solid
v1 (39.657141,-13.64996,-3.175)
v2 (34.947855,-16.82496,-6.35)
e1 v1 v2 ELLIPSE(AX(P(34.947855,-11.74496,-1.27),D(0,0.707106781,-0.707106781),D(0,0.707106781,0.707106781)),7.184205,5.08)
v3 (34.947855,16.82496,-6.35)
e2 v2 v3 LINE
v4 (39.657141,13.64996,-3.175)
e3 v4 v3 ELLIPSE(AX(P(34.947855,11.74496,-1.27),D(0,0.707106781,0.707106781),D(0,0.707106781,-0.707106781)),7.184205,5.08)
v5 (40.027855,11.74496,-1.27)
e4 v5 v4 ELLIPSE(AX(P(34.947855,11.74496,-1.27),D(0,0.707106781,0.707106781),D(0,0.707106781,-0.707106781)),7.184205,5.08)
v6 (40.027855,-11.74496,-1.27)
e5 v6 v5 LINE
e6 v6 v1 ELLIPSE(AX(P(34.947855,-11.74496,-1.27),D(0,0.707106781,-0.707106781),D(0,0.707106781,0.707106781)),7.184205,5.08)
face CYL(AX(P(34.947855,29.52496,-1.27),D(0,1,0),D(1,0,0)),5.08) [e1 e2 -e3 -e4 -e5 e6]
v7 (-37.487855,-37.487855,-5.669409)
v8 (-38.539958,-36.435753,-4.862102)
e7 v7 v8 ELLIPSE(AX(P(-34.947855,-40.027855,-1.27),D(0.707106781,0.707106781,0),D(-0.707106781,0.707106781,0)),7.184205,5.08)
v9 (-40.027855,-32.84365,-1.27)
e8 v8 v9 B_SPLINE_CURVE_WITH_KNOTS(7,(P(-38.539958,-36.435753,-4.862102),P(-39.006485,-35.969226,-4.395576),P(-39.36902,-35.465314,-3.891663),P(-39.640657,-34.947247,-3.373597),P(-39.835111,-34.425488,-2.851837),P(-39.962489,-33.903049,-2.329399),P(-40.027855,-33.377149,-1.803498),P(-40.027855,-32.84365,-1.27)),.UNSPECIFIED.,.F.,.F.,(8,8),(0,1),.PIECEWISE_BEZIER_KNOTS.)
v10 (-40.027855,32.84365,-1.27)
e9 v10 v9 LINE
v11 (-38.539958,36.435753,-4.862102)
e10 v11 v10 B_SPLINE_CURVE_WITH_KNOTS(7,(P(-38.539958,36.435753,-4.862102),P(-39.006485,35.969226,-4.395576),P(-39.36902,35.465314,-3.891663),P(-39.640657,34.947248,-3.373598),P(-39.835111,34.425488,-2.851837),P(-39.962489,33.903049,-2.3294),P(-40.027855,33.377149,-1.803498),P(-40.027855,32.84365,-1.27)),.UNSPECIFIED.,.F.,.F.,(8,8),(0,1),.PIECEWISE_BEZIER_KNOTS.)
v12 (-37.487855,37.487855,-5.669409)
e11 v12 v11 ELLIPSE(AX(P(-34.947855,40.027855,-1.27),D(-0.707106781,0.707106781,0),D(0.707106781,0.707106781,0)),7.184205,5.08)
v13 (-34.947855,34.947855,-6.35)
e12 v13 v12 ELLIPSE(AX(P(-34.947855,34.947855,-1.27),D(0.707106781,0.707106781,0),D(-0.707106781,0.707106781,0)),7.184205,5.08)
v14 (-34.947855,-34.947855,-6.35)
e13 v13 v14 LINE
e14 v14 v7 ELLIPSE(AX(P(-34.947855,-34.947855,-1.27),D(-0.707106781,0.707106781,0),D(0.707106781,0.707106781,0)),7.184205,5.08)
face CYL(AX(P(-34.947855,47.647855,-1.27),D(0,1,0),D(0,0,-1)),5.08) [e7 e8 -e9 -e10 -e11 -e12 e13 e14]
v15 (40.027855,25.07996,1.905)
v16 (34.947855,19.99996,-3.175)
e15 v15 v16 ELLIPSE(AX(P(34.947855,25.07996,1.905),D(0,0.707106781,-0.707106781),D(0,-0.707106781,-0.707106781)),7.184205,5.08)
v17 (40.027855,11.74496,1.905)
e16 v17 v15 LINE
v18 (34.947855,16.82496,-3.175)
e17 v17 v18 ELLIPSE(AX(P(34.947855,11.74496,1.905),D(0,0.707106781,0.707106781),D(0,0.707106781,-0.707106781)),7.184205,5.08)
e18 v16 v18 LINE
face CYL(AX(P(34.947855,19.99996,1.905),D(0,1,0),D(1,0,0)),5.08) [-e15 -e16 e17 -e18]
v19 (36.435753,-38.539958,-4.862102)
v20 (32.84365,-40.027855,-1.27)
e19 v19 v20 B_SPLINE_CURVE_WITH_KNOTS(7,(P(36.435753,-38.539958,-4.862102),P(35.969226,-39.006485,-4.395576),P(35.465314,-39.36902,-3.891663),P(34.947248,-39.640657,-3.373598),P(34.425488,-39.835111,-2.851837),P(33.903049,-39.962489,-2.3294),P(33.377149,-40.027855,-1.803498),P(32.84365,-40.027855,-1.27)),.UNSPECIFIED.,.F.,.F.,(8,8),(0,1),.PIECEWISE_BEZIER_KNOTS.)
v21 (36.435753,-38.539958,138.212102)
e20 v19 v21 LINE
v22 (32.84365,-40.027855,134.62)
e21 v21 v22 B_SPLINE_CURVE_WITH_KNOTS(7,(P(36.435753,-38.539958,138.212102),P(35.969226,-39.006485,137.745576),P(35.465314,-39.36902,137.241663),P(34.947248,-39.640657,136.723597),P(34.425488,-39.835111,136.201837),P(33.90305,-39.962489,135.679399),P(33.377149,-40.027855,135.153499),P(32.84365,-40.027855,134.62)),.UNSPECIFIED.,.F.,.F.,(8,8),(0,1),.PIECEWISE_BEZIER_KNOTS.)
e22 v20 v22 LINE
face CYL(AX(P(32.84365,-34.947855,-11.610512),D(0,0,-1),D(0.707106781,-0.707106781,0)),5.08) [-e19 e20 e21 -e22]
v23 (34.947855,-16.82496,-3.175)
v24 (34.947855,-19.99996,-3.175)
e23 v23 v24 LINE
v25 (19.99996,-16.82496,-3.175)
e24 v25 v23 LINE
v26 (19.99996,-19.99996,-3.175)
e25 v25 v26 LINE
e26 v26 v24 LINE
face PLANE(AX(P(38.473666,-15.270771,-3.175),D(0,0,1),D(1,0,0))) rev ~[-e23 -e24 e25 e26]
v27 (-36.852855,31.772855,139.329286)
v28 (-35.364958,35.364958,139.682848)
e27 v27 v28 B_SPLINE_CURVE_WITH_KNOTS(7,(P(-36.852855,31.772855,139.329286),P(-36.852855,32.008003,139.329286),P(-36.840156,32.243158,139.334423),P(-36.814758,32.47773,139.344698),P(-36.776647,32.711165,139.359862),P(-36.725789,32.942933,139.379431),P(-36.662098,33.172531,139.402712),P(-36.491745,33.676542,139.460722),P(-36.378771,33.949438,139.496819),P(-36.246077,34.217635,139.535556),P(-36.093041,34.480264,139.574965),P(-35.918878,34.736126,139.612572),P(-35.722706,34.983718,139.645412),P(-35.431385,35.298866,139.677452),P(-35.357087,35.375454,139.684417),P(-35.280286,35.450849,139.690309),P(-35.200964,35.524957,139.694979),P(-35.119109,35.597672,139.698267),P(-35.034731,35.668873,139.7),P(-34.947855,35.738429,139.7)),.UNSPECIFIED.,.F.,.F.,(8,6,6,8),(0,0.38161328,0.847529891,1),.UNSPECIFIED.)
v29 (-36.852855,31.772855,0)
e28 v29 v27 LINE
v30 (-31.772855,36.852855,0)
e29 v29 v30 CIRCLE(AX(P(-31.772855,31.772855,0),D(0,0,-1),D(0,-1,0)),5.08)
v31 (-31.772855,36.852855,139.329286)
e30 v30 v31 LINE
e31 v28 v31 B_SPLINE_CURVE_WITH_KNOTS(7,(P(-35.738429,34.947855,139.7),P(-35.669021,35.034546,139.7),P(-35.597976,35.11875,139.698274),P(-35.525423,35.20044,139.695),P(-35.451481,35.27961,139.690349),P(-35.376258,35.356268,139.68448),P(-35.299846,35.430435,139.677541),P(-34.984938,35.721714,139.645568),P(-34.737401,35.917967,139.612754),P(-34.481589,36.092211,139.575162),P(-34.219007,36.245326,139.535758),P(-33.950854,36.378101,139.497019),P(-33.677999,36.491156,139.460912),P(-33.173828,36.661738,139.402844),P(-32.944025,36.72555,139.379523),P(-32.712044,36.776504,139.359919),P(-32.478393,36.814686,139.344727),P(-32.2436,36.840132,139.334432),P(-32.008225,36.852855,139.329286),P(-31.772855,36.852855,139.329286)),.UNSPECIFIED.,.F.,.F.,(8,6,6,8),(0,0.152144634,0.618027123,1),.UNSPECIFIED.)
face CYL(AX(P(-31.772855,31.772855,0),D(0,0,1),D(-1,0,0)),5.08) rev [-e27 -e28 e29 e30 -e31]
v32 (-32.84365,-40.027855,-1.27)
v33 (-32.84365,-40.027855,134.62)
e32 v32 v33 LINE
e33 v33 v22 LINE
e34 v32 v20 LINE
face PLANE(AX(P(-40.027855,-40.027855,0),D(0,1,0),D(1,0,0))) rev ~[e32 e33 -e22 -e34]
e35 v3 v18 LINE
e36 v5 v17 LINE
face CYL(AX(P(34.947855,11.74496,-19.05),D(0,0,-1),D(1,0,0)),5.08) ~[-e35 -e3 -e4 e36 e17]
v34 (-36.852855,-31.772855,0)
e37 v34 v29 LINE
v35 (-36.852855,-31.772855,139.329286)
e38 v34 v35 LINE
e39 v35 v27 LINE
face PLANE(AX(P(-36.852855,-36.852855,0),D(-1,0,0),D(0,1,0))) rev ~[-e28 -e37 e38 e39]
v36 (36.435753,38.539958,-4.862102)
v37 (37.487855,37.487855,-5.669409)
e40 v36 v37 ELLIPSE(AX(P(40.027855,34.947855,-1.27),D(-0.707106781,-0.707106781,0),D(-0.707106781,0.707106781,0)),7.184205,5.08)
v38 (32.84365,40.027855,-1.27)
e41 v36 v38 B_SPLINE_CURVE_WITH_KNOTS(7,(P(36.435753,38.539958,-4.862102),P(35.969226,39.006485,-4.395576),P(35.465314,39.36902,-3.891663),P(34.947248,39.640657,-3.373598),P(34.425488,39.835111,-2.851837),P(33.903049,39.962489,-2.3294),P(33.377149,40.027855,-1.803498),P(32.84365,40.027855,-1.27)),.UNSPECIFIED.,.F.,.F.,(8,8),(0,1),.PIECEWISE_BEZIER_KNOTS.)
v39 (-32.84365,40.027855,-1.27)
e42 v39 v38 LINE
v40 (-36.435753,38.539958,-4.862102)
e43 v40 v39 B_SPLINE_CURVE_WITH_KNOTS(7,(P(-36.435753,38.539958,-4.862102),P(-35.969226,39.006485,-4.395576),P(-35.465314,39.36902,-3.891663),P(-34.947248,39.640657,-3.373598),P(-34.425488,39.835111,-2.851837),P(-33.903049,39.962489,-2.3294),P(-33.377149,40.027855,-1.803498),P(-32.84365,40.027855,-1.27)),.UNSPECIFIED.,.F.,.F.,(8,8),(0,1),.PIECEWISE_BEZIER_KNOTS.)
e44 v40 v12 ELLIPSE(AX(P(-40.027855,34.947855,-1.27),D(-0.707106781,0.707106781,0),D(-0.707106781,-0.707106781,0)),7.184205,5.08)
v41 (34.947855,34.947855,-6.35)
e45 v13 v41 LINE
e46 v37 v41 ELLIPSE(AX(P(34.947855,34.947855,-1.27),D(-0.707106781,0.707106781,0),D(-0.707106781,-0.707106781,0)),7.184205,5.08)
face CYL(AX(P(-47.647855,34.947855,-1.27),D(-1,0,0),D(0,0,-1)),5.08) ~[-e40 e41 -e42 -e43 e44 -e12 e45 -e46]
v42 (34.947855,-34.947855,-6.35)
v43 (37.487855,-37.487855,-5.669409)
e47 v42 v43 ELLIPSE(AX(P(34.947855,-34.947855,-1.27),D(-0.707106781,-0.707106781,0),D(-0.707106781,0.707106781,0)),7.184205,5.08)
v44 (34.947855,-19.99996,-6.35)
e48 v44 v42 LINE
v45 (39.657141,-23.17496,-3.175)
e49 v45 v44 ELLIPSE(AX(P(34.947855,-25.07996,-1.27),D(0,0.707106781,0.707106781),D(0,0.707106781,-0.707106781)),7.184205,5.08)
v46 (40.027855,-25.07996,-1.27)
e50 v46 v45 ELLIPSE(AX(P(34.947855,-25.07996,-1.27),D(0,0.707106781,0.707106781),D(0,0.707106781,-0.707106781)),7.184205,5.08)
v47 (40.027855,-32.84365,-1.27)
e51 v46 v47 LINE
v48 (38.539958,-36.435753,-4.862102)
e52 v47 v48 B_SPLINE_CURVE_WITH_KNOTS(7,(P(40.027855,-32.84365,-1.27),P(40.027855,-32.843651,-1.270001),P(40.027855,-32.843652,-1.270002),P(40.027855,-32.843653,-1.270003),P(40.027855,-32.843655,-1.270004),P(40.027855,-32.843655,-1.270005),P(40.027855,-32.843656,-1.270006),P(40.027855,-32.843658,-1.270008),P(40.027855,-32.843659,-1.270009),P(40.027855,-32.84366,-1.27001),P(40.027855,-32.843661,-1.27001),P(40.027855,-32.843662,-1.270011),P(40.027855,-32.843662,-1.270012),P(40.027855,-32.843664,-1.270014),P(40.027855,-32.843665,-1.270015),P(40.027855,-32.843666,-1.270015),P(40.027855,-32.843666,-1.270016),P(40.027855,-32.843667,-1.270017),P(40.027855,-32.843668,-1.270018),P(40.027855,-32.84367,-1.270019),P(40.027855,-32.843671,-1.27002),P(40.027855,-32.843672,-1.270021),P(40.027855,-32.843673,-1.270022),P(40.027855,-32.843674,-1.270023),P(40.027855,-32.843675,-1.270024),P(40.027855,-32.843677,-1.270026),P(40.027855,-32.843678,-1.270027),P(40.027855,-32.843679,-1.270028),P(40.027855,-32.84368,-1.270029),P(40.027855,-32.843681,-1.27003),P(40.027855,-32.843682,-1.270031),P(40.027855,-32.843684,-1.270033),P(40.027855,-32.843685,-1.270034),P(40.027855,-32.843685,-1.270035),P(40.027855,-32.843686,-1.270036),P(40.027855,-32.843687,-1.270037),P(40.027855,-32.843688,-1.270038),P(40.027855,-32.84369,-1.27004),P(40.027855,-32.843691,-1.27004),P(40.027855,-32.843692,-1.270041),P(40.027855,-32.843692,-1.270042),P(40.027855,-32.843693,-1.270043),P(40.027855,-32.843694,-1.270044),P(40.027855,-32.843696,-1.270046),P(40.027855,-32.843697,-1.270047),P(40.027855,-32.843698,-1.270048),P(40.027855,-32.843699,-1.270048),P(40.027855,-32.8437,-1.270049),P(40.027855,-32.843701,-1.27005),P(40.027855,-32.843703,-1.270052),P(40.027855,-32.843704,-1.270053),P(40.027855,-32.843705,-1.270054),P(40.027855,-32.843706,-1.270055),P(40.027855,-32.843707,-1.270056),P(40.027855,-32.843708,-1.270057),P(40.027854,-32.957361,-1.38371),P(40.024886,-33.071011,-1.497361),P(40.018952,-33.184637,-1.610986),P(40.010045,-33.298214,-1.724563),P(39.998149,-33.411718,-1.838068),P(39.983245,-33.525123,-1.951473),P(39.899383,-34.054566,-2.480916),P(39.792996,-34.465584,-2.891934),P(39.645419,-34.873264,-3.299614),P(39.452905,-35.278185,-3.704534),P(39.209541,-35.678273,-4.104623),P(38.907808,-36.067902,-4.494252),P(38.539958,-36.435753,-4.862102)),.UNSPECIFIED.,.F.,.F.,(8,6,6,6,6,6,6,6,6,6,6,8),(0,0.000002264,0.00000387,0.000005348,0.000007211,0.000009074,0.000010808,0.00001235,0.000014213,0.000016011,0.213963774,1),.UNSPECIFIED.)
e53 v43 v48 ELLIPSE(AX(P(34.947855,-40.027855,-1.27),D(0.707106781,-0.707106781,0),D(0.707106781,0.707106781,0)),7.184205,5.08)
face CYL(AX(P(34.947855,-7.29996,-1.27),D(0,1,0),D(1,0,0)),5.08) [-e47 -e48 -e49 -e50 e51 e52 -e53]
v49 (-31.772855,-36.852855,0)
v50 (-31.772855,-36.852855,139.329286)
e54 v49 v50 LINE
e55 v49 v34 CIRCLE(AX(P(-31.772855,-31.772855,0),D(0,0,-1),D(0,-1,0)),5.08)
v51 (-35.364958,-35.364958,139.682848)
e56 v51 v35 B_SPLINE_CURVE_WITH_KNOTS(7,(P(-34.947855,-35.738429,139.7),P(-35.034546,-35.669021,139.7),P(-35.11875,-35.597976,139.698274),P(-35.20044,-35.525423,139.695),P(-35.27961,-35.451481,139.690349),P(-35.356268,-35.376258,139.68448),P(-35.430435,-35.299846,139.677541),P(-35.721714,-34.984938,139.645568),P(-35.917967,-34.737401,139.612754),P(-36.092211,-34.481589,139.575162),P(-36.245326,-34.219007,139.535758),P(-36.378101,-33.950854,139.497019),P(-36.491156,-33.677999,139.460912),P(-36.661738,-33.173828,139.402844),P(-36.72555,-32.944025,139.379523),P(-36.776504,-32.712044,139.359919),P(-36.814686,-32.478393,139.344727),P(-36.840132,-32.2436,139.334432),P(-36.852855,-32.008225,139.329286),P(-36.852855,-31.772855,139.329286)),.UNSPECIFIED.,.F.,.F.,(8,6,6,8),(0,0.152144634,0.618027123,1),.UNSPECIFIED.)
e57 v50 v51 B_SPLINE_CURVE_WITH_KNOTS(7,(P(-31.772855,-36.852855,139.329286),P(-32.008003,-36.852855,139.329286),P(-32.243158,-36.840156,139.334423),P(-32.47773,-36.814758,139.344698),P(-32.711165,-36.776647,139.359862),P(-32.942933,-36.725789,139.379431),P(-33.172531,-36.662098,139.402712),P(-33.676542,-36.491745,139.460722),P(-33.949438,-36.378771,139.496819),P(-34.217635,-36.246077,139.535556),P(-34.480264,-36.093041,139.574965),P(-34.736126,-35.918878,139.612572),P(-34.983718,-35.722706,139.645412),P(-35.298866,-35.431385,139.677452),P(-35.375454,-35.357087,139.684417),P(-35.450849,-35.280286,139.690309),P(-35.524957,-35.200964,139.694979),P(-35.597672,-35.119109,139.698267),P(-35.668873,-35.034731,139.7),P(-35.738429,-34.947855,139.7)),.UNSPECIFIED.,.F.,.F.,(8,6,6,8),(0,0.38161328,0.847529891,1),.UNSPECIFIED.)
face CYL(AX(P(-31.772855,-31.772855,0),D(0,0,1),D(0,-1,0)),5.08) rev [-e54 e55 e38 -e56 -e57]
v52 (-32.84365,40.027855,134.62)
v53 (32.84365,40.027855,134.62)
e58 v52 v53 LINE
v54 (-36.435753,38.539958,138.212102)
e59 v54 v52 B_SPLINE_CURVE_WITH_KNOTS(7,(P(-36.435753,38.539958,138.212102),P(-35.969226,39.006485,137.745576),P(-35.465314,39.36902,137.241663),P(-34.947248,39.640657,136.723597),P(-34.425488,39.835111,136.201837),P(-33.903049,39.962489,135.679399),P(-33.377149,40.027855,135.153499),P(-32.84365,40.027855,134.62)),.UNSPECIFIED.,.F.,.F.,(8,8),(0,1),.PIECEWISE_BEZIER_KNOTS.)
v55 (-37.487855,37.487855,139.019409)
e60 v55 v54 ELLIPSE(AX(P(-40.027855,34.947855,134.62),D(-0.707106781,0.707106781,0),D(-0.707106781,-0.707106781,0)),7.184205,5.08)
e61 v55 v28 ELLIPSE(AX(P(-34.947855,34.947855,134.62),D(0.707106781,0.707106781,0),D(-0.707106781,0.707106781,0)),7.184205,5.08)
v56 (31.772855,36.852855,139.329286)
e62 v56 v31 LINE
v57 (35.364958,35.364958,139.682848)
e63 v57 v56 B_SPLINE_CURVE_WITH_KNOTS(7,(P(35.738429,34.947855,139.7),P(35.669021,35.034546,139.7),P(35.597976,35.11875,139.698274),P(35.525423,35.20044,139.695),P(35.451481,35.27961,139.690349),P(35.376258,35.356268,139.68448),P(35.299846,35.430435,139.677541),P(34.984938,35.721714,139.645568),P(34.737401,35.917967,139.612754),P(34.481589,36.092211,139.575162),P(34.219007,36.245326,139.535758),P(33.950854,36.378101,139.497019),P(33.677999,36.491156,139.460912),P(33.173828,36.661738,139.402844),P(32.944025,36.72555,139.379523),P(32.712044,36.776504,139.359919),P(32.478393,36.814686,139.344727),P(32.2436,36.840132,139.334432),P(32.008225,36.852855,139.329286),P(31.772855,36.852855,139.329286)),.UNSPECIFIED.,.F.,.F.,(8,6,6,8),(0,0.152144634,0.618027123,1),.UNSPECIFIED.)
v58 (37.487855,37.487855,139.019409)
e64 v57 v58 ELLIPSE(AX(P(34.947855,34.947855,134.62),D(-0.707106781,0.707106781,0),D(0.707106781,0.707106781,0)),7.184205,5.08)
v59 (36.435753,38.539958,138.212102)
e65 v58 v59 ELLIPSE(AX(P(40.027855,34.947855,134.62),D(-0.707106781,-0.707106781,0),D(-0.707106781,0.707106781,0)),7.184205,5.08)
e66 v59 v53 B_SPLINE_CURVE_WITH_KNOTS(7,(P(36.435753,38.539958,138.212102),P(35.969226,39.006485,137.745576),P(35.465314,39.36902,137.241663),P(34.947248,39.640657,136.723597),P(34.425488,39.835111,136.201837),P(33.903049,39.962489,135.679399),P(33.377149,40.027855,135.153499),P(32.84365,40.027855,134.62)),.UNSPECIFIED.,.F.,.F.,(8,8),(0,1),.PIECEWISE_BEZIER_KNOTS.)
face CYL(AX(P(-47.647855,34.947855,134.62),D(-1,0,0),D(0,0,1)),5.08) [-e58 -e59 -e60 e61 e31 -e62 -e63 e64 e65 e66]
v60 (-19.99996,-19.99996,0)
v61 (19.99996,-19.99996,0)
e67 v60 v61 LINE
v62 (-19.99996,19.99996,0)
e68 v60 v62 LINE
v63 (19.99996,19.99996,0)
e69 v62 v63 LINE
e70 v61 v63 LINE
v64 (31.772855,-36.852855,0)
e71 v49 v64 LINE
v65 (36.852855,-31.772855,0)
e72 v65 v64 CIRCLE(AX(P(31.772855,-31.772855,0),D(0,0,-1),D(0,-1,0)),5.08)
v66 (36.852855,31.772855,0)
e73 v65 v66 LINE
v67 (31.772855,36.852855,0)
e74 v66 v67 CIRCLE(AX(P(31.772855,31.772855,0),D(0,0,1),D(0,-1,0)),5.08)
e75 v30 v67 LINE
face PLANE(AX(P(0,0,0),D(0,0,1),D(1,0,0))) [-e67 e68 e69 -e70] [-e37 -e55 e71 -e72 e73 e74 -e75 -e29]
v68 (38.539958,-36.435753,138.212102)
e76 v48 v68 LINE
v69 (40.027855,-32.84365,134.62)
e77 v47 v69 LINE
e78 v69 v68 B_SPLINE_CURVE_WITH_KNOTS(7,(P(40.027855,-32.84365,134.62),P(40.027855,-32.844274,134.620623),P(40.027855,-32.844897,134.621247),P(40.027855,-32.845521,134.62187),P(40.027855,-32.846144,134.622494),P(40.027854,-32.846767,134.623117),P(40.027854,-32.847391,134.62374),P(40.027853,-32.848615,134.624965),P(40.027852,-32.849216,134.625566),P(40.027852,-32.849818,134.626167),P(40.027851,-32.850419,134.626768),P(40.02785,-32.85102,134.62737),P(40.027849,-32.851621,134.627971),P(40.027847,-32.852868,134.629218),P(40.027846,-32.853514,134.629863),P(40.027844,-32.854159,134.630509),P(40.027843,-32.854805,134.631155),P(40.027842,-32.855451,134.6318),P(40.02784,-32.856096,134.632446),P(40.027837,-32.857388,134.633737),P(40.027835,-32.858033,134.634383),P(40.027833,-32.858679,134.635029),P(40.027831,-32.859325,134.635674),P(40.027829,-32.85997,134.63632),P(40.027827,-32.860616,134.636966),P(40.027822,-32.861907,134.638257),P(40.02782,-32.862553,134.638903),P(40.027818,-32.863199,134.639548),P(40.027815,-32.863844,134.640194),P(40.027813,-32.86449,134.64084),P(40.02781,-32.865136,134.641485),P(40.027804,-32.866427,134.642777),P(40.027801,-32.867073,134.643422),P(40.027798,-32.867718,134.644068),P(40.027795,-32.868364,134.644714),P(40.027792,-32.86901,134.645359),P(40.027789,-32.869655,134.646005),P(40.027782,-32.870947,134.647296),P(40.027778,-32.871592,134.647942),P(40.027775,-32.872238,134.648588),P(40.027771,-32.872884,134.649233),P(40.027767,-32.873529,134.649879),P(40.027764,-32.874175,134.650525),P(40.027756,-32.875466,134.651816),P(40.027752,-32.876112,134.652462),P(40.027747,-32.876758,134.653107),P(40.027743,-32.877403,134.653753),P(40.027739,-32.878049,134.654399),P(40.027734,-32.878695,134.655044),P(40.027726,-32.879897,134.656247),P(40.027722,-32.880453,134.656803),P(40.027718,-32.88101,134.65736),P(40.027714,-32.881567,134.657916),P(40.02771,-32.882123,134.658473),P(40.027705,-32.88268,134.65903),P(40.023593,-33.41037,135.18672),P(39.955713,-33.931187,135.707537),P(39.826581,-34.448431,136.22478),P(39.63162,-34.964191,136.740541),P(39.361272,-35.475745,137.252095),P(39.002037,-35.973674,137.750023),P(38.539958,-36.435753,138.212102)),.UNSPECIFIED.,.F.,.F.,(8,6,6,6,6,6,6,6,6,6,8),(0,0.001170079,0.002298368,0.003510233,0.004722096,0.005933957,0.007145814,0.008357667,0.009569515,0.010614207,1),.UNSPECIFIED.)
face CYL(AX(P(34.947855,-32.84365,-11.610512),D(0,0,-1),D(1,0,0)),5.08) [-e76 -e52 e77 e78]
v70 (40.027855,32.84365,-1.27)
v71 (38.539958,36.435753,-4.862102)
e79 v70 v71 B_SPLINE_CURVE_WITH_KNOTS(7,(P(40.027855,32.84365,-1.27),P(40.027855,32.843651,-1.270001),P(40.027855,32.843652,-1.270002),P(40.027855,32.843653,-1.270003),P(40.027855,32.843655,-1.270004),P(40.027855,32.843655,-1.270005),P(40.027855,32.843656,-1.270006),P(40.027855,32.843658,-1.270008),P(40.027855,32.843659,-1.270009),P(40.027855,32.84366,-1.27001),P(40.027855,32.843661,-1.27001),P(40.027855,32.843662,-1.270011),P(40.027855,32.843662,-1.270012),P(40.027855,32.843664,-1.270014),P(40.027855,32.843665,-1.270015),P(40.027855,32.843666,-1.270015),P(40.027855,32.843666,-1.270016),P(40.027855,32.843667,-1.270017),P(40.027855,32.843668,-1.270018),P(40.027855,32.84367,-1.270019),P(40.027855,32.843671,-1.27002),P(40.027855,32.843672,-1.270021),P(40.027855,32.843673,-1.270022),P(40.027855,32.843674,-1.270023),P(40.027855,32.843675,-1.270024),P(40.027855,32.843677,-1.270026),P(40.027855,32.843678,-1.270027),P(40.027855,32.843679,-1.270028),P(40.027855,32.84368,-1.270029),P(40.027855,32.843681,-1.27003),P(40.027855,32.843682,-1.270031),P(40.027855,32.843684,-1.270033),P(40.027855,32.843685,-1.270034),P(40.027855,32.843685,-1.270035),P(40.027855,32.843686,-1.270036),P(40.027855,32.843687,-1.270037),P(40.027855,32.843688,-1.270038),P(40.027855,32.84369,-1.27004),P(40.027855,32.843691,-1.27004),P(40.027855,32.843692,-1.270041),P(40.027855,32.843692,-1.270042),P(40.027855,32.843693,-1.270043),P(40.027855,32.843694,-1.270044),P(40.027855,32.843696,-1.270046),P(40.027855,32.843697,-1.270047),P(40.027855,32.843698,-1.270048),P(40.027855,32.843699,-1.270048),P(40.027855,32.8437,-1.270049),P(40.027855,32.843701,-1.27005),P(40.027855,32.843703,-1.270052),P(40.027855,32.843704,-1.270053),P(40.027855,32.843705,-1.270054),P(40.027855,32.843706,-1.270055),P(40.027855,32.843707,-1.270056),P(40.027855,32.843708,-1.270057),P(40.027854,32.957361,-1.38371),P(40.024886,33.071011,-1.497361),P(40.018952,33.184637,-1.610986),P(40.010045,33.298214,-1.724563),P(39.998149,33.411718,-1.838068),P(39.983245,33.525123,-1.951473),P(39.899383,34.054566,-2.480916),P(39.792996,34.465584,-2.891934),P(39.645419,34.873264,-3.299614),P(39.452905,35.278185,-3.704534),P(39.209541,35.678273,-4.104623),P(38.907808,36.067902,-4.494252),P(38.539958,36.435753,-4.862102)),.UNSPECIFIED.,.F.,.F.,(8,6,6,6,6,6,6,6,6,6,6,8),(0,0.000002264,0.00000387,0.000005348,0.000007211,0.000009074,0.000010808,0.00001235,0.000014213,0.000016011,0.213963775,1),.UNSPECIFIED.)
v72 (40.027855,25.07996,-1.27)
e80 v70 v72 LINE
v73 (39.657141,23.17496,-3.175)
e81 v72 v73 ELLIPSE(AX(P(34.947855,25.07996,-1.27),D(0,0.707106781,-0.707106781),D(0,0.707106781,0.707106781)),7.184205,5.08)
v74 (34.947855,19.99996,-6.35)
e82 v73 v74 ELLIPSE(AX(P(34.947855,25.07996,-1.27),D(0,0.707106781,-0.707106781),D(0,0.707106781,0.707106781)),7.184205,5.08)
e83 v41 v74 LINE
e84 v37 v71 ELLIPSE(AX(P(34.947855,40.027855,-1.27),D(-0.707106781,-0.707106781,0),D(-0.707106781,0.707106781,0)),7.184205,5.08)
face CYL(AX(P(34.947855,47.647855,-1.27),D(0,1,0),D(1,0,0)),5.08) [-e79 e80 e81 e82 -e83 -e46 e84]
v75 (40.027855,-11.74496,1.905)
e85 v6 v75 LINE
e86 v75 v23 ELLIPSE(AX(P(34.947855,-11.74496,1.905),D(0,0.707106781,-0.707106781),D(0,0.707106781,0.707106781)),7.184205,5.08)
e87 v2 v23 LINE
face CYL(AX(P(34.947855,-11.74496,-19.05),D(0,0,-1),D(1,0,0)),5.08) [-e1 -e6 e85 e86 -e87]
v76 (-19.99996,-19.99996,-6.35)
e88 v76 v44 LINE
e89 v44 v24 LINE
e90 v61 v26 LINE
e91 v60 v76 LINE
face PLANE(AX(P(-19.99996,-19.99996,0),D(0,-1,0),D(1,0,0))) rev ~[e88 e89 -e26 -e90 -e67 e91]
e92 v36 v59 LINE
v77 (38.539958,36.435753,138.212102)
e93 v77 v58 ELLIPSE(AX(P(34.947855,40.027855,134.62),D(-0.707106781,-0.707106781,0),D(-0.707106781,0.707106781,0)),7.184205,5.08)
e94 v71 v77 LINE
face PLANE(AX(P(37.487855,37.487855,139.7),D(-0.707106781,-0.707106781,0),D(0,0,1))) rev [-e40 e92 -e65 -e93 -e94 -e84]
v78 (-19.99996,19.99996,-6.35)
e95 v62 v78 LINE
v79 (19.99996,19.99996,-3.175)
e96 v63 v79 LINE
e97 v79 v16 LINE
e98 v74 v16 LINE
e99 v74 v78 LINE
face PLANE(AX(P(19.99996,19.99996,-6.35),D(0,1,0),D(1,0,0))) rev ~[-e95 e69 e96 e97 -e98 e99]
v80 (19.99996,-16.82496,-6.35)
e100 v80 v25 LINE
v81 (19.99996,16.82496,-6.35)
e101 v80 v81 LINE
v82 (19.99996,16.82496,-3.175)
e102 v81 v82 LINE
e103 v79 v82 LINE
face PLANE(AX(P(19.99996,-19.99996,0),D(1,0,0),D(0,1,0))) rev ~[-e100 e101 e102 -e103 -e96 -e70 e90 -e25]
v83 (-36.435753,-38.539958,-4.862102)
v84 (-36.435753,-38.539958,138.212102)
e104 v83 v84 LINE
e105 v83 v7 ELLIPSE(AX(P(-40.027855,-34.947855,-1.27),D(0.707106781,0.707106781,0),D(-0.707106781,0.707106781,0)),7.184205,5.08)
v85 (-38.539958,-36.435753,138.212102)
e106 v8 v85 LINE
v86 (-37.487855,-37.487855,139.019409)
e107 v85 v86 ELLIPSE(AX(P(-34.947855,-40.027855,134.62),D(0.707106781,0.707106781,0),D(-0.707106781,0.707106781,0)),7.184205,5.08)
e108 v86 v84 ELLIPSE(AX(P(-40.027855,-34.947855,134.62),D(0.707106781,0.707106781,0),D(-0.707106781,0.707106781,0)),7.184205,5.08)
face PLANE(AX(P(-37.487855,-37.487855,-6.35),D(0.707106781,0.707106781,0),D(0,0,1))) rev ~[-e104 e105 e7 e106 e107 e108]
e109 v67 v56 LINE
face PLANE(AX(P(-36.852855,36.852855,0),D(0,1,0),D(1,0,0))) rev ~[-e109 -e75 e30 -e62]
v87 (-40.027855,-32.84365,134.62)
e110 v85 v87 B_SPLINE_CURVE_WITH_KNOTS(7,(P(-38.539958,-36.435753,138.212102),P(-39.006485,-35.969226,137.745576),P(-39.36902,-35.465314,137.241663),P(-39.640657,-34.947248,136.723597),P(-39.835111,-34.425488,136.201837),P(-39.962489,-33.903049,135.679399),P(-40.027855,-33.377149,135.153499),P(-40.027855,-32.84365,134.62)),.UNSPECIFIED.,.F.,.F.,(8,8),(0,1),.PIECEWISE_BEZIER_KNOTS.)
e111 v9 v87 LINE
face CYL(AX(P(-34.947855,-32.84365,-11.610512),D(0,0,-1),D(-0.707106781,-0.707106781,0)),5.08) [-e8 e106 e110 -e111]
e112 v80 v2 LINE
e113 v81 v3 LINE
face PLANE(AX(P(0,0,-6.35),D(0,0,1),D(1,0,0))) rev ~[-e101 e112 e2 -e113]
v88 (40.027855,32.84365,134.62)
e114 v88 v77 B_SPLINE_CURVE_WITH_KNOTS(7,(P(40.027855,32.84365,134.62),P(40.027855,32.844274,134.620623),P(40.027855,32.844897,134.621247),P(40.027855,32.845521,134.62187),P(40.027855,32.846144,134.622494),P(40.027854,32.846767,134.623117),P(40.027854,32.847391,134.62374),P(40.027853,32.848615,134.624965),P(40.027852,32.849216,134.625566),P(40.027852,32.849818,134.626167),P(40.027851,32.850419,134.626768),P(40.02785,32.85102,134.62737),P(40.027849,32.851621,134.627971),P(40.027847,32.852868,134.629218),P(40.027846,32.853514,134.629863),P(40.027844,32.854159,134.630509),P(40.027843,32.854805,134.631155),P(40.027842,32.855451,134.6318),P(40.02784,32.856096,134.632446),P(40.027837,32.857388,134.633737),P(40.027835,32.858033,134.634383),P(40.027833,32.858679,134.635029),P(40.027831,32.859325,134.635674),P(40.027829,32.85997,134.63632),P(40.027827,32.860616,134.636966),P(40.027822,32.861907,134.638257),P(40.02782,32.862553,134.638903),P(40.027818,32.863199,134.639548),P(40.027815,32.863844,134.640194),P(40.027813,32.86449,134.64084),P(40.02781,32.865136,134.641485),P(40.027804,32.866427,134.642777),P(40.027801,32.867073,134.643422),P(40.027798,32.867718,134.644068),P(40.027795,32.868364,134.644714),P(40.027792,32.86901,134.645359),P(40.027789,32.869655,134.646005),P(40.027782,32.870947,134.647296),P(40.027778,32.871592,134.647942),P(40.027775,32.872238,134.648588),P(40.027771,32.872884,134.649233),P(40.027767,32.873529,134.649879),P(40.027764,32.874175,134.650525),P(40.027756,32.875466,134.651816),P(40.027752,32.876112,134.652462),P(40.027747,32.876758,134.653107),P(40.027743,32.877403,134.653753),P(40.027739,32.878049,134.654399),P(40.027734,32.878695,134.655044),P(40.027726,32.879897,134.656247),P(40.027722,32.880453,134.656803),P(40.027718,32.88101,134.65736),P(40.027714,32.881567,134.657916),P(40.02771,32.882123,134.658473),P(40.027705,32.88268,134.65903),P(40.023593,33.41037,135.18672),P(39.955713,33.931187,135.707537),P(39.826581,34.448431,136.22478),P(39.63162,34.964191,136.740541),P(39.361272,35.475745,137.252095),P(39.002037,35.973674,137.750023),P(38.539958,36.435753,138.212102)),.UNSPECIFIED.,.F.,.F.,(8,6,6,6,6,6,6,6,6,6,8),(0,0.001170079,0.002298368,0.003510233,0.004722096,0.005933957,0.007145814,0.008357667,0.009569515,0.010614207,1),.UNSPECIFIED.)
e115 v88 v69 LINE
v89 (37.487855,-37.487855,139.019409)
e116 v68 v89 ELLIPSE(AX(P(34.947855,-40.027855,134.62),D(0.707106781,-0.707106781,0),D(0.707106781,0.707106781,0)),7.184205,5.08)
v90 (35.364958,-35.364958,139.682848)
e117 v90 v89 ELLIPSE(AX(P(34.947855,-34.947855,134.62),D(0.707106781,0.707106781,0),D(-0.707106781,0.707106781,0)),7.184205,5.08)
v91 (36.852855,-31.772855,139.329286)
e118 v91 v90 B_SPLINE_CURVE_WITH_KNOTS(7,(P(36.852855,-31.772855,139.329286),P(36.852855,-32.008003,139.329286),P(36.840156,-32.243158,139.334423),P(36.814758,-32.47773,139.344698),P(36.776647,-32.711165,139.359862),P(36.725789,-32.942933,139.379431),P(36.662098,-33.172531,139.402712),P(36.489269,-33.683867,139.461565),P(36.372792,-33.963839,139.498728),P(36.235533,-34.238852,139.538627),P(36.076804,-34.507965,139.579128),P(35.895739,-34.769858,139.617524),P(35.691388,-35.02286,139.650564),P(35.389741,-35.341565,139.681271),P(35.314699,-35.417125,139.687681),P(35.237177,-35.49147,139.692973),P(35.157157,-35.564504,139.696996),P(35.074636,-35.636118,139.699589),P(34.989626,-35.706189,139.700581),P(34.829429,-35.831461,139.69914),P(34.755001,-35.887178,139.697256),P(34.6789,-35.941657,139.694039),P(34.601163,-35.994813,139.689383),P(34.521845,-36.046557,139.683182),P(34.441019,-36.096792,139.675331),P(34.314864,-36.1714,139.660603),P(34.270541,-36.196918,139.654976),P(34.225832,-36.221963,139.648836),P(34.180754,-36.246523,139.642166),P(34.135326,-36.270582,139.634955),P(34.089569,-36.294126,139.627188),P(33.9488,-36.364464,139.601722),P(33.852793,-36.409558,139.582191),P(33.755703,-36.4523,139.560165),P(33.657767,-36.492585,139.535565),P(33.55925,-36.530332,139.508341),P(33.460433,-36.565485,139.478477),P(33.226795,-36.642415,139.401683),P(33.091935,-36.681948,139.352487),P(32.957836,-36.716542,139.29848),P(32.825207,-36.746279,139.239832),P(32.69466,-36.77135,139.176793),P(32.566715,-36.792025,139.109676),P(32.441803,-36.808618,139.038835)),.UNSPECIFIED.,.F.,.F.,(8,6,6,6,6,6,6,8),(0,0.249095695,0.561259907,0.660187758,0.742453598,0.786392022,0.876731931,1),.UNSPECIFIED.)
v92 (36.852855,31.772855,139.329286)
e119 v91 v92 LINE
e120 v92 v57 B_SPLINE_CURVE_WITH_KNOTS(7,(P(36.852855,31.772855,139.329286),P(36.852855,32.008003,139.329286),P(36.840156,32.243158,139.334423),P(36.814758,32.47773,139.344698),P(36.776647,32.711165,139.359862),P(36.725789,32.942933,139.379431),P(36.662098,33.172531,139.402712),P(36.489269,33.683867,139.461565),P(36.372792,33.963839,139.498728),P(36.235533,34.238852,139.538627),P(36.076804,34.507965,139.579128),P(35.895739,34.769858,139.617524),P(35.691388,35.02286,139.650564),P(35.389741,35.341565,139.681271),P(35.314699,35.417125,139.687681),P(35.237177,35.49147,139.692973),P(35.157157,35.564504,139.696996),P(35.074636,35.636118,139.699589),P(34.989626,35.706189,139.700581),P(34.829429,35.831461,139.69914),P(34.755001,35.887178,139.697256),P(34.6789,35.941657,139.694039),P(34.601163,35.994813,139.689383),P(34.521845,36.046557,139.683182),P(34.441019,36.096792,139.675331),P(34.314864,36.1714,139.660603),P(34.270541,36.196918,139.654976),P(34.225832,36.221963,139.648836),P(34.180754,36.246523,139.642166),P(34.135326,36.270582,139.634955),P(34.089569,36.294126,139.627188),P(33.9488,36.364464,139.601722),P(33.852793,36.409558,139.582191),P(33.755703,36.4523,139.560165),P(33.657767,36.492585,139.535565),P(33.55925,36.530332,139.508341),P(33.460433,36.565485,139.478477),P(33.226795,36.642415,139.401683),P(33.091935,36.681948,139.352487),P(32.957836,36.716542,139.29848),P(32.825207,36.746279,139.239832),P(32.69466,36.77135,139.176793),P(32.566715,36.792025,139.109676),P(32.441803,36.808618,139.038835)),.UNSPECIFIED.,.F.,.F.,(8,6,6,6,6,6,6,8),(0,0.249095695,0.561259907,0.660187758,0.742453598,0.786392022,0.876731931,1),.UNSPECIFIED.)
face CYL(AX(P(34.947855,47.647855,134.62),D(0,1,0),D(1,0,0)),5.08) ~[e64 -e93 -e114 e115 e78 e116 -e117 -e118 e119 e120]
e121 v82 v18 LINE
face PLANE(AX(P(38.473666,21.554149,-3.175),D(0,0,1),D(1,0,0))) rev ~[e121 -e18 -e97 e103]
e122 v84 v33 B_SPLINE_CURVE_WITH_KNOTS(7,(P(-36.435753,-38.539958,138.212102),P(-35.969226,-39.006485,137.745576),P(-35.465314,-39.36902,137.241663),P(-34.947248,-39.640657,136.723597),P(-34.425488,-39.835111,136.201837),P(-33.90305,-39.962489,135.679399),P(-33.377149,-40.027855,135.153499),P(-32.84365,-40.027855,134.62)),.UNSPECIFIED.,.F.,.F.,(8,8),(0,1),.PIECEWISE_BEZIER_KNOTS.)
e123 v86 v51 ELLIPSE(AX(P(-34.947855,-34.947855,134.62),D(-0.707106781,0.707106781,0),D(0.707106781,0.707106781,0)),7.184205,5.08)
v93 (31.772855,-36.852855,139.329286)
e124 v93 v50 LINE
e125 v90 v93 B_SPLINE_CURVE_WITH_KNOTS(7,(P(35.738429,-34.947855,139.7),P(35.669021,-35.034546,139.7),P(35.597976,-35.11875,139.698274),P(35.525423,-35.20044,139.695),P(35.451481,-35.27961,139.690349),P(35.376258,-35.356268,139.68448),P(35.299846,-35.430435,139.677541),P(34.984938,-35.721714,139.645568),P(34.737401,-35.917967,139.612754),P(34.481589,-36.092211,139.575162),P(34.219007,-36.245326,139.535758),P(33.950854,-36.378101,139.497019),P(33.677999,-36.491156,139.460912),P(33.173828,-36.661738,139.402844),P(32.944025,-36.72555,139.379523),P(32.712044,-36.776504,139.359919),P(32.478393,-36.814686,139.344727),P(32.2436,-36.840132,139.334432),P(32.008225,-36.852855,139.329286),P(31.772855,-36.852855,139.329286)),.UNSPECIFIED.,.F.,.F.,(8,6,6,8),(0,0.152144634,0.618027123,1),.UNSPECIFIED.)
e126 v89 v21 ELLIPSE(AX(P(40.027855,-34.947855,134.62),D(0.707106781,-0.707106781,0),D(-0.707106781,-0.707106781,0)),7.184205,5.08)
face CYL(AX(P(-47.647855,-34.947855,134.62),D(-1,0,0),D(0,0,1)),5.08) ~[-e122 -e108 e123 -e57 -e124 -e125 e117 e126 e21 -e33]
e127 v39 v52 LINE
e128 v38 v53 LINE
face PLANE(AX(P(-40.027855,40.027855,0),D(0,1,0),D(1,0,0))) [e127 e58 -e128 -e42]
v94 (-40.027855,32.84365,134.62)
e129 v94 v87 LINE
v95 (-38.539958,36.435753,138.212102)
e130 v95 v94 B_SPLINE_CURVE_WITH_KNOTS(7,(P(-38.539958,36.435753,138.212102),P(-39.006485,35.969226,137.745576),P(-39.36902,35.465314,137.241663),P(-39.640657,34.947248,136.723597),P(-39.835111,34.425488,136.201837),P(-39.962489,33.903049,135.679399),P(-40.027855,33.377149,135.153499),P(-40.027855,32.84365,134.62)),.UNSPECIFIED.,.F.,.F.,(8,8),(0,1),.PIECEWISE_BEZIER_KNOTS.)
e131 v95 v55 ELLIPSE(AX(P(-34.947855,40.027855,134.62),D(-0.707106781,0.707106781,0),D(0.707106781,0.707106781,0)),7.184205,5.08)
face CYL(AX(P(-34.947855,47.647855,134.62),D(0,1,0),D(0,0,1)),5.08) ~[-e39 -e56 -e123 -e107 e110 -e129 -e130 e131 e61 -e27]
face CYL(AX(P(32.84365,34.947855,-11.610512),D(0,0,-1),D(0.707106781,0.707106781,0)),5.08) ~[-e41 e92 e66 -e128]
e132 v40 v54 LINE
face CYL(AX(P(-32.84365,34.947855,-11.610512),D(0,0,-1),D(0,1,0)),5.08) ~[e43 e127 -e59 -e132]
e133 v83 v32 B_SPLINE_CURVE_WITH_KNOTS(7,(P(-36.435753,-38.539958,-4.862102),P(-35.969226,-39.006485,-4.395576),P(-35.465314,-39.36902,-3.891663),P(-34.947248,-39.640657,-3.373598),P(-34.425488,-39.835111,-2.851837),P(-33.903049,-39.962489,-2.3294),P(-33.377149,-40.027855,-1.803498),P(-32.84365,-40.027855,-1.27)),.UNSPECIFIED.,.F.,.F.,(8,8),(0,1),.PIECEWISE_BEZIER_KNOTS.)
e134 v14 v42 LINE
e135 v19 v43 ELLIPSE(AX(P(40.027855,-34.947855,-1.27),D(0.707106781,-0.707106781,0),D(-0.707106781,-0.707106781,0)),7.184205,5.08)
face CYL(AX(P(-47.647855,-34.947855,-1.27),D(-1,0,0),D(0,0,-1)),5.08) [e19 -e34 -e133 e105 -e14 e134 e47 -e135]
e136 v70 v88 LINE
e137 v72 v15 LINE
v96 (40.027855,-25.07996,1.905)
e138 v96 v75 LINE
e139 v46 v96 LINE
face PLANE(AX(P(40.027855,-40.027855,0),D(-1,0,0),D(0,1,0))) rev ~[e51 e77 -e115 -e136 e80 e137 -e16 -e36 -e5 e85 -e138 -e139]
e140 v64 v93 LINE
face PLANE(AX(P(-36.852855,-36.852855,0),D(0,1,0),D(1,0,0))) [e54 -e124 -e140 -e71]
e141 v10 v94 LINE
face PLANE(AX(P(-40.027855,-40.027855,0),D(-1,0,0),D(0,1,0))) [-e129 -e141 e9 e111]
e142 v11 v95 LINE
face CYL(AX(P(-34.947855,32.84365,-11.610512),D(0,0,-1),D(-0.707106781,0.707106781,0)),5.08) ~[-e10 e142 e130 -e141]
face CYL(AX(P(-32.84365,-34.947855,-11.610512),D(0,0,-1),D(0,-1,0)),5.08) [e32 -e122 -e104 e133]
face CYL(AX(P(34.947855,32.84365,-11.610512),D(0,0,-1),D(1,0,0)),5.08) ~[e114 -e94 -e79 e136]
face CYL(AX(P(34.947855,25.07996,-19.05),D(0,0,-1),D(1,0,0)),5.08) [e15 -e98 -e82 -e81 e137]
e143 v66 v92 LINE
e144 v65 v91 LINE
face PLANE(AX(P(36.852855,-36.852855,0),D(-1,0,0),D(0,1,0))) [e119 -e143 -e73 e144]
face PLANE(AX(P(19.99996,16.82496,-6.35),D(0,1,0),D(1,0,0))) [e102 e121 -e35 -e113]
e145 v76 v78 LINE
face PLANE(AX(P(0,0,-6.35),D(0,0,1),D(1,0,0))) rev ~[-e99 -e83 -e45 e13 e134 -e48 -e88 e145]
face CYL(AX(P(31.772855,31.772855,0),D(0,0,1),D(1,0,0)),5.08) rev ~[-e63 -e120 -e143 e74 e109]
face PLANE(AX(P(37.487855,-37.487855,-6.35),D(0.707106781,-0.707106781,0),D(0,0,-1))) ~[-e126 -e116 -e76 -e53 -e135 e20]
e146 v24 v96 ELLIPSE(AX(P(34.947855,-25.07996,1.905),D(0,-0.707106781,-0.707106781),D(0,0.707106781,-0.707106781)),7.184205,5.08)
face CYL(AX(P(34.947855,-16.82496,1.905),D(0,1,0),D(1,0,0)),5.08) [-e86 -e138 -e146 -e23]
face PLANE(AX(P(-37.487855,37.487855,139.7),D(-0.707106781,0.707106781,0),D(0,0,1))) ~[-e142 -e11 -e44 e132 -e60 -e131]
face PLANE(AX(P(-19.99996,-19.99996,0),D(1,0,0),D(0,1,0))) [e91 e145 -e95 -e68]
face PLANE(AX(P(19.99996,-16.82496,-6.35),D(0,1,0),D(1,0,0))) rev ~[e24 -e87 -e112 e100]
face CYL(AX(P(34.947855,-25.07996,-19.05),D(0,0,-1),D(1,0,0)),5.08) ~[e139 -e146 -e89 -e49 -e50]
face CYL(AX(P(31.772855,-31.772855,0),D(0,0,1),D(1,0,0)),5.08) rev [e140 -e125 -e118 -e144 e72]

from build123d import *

# Parameters (mm, degrees)
F0_W         = 80.0557104707
F0_H         = 80.0557104707
F0_W_2       = 73.7057104707
F0_H_2       = 73.7057104707
F0_W_3       = 39.99992
F0_H_3       = 39.99992
F1_DEPTH     = 6.35
F2_DEPTH     = 9.144
F3_DEPTH     = 139.7
F4_W         = 20.0278952353
F4_H         = 3.175
F5_DEPTH     = 3.175
F6_SIZE      = 5.08
F7_T1_DEPTH  = 95.2957104707
F7_T3_DEPTH  = 156.5710244843
F7_T5_DEPTH  = 95.2957104707
F7_T7_DEPTH  = 40.3478952353
F7_T9_DEPTH  = 40.3478952353
F7_T11_DEPTH = 15.875
F7_T13_DEPTH = 3.175
F7_T15_DEPTH = 3.175
F7_T17_DEPTH = 59.04992
F7_T23_DEPTH = 28.575
F7_T27_DEPTH = 15.875
F7_T34_DEPTH = 28.575
F7_T38_DEPTH = 15.875
F7_T45_DEPTH = 15.875
F7_T49_DEPTH = 28.575
F7_T56_DEPTH = 15.875
F7_T60_DEPTH = 28.575
F8_R         = 5.08


# Not quite as in the source:
# - a fillet or chamfer that OpenCascade refuses, or shapes differently, is made with other operations: its cross-section is extruded or revolved along the edge and cut away or added


with BuildPart() as f1:
    # F0 (on Top) → F1 (new body)
    with BuildSketch(Plane.XY):
        Rectangle(F0_W, F0_H)
        Rectangle(F0_W_2, F0_H_2, mode=Mode.SUBTRACT)
        Rectangle(F0_W_2, F0_H_2)
        Rectangle(F0_W_3, F0_H_3, mode=Mode.SUBTRACT)
        Rectangle(F0_W_3, F0_H_3)
    extrude(amount=-F1_DEPTH)

    # F0 (on Top) → F2 (cut)
    with BuildSketch(Plane.XY):
        Rectangle(F0_W_3, F0_H_3)
    extrude(amount=-F2_DEPTH, mode=Mode.SUBTRACT)

    # F0 (on Top) → F3 (join)
    with BuildSketch(Plane.XY):
        Rectangle(F0_W, F0_H)
        Rectangle(F0_W_2, F0_H_2, mode=Mode.SUBTRACT)
    extrude(amount=F3_DEPTH)

    # F4 (on face) → F5 (cut)
    with BuildSketch(Plane(origin=(0, 0, -6.35), x_dir=(1, 0, 0), z_dir=(0, 0, -1))):
        with Locations((30.0139076177, 18.41246)):
            Rectangle(F4_W, F4_H)
        with Locations((30.0139076177, -18.41246)):
            Rectangle(F4_W, F4_H)
    extrude(amount=-F5_DEPTH, mode=Mode.SUBTRACT)

    # F6
    f6_edges = [f1.edges().sort_by_distance(p)[0] for p in [
        (40.027855, -40.027855, 66.675),
        (-40.027855, -40.027855, 66.675),
        (-40.027855, 40.027855, 66.675),
        (40.027855, 40.027855, 66.675),
    ]]
    chamfer(f6_edges, length=F6_SIZE)

    # F7: fillet of radius 5.08 on 24 edges, made by hand

    # F7_s2 → F7_t1 (cut)
    with BuildSketch(Plane.XZ.offset(-47.6478552353)):
        with BuildLine():
            ThreePointArc((-34.9478552353, -6.35), (-38.5399576838, -4.8621024484), (-40.0278552353, -1.27))
            Line((-40.0278552353, -1.27), (-40.0278552353, -6.35))
            Line((-40.0278552353, -6.35), (-34.9478552353, -6.35))
        make_face()
        with BuildLine():
            ThreePointArc((-34.9478552353, 139.7), (-38.5399576838, 138.2121024484), (-40.0278552353, 134.62))
            Line((-40.0278552353, 134.62), (-40.0278552353, 139.7))
            Line((-40.0278552353, 139.7), (-34.9478552353, 139.7))
        make_face()
        with BuildLine():
            ThreePointArc((40.0278552353, 134.62), (38.5399576838, 138.2121024484), (34.9478552353, 139.7))
            Line((34.9478552353, 139.7), (40.0278552353, 139.7))
            Line((40.0278552353, 139.7), (40.0278552353, 134.62))
        make_face()
    extrude(amount=F7_T1_DEPTH, mode=Mode.SUBTRACT)

    # F7_s4 → F7_t3 (cut)
    with BuildSketch(Plane.XY.offset(-11.6105122421)):
        with BuildLine():
            ThreePointArc((-38.5399576838, 36.4357527869), (-39.6411632605, 34.7876821749), (-40.0278552353, 32.8436503385))
            Line((-40.0278552353, 32.8436503385), (-40.0278552353, 34.9478552353))
            Line((-40.0278552353, 34.9478552353), (-38.5399576838, 36.4357527869))
        make_face()
        with BuildLine():
            ThreePointArc((-38.5399576838, -36.4357527869), (-39.6411632605, -34.7876821749), (-40.0278552353, -32.8436503385))
            Line((-40.0278552353, -32.8436503385), (-40.0278552353, -34.9478552353))
            Line((-40.0278552353, -34.9478552353), (-38.5399576838, -36.4357527869))
        make_face()
        with BuildLine():
            ThreePointArc((36.4357527869, 38.5399576838), (34.7876821749, 39.6411632605), (32.8436503385, 40.0278552353))
            Line((32.8436503385, 40.0278552353), (34.9478552353, 40.0278552353))
            Line((34.9478552353, 40.0278552353), (36.4357527869, 38.5399576838))
        make_face()
        with BuildLine():
            ThreePointArc((-32.8436503385, 40.0278552353), (-34.7876821749, 39.6411632605), (-36.4357527869, 38.5399576838))
            Line((-36.4357527869, 38.5399576838), (-34.9478552353, 40.0278552353))
            Line((-34.9478552353, 40.0278552353), (-32.8436503385, 40.0278552353))
        make_face()
        with BuildLine():
            ThreePointArc((40.0278552353, -32.8436503385), (39.6411632605, -34.7876821749), (38.5399576838, -36.4357527869))
            Line((38.5399576838, -36.4357527869), (40.0278552353, -34.9478552353))
            Line((40.0278552353, -34.9478552353), (40.0278552353, -32.8436503385))
        make_face()
        with BuildLine():
            ThreePointArc((40.0278552353, 32.8436503385), (39.6411632605, 34.7876821749), (38.5399576838, 36.4357527869))
            Line((38.5399576838, 36.4357527869), (40.0278552353, 34.9478552353))
            Line((40.0278552353, 34.9478552353), (40.0278552353, 32.8436503385))
        make_face()
        with BuildLine():
            ThreePointArc((-32.8436503385, -40.0278552353), (-34.7876821749, -39.6411632605), (-36.4357527869, -38.5399576838))
            Line((-36.4357527869, -38.5399576838), (-34.9478552353, -40.0278552353))
            Line((-34.9478552353, -40.0278552353), (-32.8436503385, -40.0278552353))
        make_face()
        with BuildLine():
            ThreePointArc((36.4357527869, -38.5399576838), (34.7876821749, -39.6411632605), (32.8436503385, -40.0278552353))
            Line((32.8436503385, -40.0278552353), (34.9478552353, -40.0278552353))
            Line((34.9478552353, -40.0278552353), (36.4357527869, -38.5399576838))
        make_face()
    extrude(amount=F7_T3_DEPTH, mode=Mode.SUBTRACT)

    # F7_s6 → F7_t5 (cut)
    with BuildSketch(Plane.YZ.offset(-47.6478552353)):
        with BuildLine():
            ThreePointArc((34.9478552353, -6.35), (38.5399576838, -4.8621024484), (40.0278552353, -1.27))
            Line((40.0278552353, -1.27), (40.0278552353, -6.35))
            Line((40.0278552353, -6.35), (34.9478552353, -6.35))
        make_face()
        with BuildLine():
            ThreePointArc((34.9478552353, 139.7), (38.5399576838, 138.2121024484), (40.0278552353, 134.62))
            Line((40.0278552353, 134.62), (40.0278552353, 139.7))
            Line((40.0278552353, 139.7), (34.9478552353, 139.7))
        make_face()
        with BuildLine():
            ThreePointArc((-34.9478552353, -6.35), (-38.5399576838, -4.8621024484), (-40.0278552353, -1.27))
            Line((-40.0278552353, -1.27), (-40.0278552353, -6.35))
            Line((-40.0278552353, -6.35), (-34.9478552353, -6.35))
        make_face()
        with BuildLine():
            ThreePointArc((-34.9478552353, 139.7), (-38.5399576838, 138.2121024484), (-40.0278552353, 134.62))
            Line((-40.0278552353, 134.62), (-40.0278552353, 139.7))
            Line((-40.0278552353, 139.7), (-34.9478552353, 139.7))
        make_face()
    extrude(amount=F7_T5_DEPTH, mode=Mode.SUBTRACT)

    # F7_s8 → F7_t7 (cut)
    with BuildSketch(Plane.XZ.offset(7.29996)):
        with BuildLine():
            ThreePointArc((40.0278552353, -1.27), (38.5399576838, -4.8621024484), (34.9478552353, -6.35))
            Line((34.9478552353, -6.35), (40.0278552353, -6.35))
            Line((40.0278552353, -6.35), (40.0278552353, -1.27))
        make_face()
    extrude(amount=F7_T7_DEPTH, mode=Mode.SUBTRACT)

    # F7_s10 → F7_t9 (cut)
    with BuildSketch(Plane.XZ.offset(-47.6478552353)):
        with BuildLine():
            ThreePointArc((40.0278552353, -1.27), (38.5399576838, -4.8621024484), (34.9478552353, -6.35))
            Line((34.9478552353, -6.35), (40.0278552353, -6.35))
            Line((40.0278552353, -6.35), (40.0278552353, -1.27))
        make_face()
    extrude(amount=F7_T9_DEPTH, mode=Mode.SUBTRACT)

    # F7_s12 → F7_t11 (cut)
    with BuildSketch(Plane.XY.offset(-19.05)):
        with BuildLine():
            ThreePointArc((40.0278552353, -25.07996), (38.5399576838, -21.4878575516), (34.9478552353, -19.99996))
            Line((34.9478552353, -19.99996), (40.0278552353, -19.99996))
            Line((40.0278552353, -19.99996), (40.0278552353, -25.07996))
        make_face()
        with BuildLine():
            ThreePointArc((40.0278552353, 25.07996), (38.5399576838, 21.4878575516), (34.9478552353, 19.99996))
            Line((34.9478552353, 19.99996), (40.0278552353, 19.99996))
            Line((40.0278552353, 19.99996), (40.0278552353, 25.07996))
        make_face()
        with BuildLine():
            ThreePointArc((40.0278552353, -11.74496), (38.5399576838, -15.3370624484), (34.9478552353, -16.82496))
            Line((34.9478552353, -16.82496), (40.0278552353, -16.82496))
            Line((40.0278552353, -16.82496), (40.0278552353, -11.74496))
        make_face()
        with BuildLine():
            ThreePointArc((40.0278552353, 11.74496), (38.5399576838, 15.3370624484), (34.9478552353, 16.82496))
            Line((34.9478552353, 16.82496), (40.0278552353, 16.82496))
            Line((40.0278552353, 16.82496), (40.0278552353, 11.74496))
        make_face()
    extrude(amount=F7_T11_DEPTH, mode=Mode.SUBTRACT)

    # F7_s14 → F7_t13 (cut)
    with BuildSketch(Plane.XZ.offset(16.82496)):
        with BuildLine():
            ThreePointArc((40.0278552353, 1.905), (38.5399576838, -1.6871024484), (34.9478552353, -3.175))
            Line((34.9478552353, -3.175), (40.0278552353, -3.175))
            Line((40.0278552353, -3.175), (40.0278552353, 1.905))
        make_face()
    extrude(amount=F7_T13_DEPTH, mode=Mode.SUBTRACT)

    # F7_s16 → F7_t15 (cut)
    with BuildSketch(Plane.XZ.offset(-19.99996)):
        with BuildLine():
            ThreePointArc((40.0278552353, 1.905), (38.5399576838, -1.6871024484), (34.9478552353, -3.175))
            Line((34.9478552353, -3.175), (40.0278552353, -3.175))
            Line((40.0278552353, -3.175), (40.0278552353, 1.905))
        make_face()
    extrude(amount=F7_T15_DEPTH, mode=Mode.SUBTRACT)

    # F7_s18 → F7_t17 (cut)
    with BuildSketch(Plane.XZ.offset(-29.52496)):
        with BuildLine():
            ThreePointArc((40.0278552353, -1.27), (38.5399576838, -4.8621024484), (34.9478552353, -6.35))
            Line((34.9478552353, -6.35), (40.0278552353, -6.35))
            Line((40.0278552353, -6.35), (40.0278552353, -1.27))
        make_face()
    extrude(amount=F7_T17_DEPTH, mode=Mode.SUBTRACT)


with BuildPart() as f7_tool21:
    # F7_s22 → F7_t23 (new body)
    with BuildSketch(Plane.XY.offset(-19.05)):
        with BuildLine():
            ThreePointArc((40.0278552353, -25.07996), (38.5399576838, -21.4878575516), (34.9478552353, -19.99996))
            Line((34.9478552353, -19.99996), (40.0278552353, -19.99996))
            Line((40.0278552353, -19.99996), (40.0278552353, -25.07996))
        make_face()
    extrude(amount=F7_T23_DEPTH)

    split(bisect_by=Plane.XY.offset(-3.175), keep=Keep.TOP)


with BuildPart() as f7_tool25:
    # F7_s26 → F7_t27 (new body)
    with BuildSketch(Plane.XZ.offset(16.82496)):
        with BuildLine():
            ThreePointArc((40.0278552353, 1.905), (38.5399576838, -1.6871024484), (34.9478552353, -3.175))
            Line((34.9478552353, -3.175), (40.0278552353, -3.175))
            Line((40.0278552353, -3.175), (40.0278552353, 1.905))
        make_face()
    extrude(amount=F7_T27_DEPTH)

    split(bisect_by=Plane.XZ.offset(19.99996), keep=Keep.TOP)


with BuildPart() as f7_tool21_1:
    add(f7_tool21.part)

    # F7_t29: intersect F7_tool25
    add(f7_tool25.part, mode=Mode.INTERSECT)


with BuildPart() as f1_1:
    add(f1.part)

    # F7_t19: cut F7_tool21
    add(f7_tool21_1.part, mode=Mode.SUBTRACT)


with BuildPart() as f7_tool32:
    # F7_s33 → F7_t34 (new body)
    with BuildSketch(Plane.XY.offset(-19.05)):
        with BuildLine():
            ThreePointArc((40.0278552353, 25.07996), (38.5399576838, 21.4878575516), (34.9478552353, 19.99996))
            Line((34.9478552353, 19.99996), (40.0278552353, 19.99996))
            Line((40.0278552353, 19.99996), (40.0278552353, 25.07996))
        make_face()
    extrude(amount=F7_T34_DEPTH)

    split(bisect_by=Plane.XY.offset(-3.175), keep=Keep.TOP)


with BuildPart() as f7_tool36:
    # F7_s37 → F7_t38 (new body)
    with BuildSketch(Plane.XZ.offset(-32.69996)):
        with BuildLine():
            ThreePointArc((40.0278552353, 1.905), (38.5399576838, -1.6871024484), (34.9478552353, -3.175))
            Line((34.9478552353, -3.175), (40.0278552353, -3.175))
            Line((40.0278552353, -3.175), (40.0278552353, 1.905))
        make_face()
    extrude(amount=F7_T38_DEPTH)

    split(bisect_by=Plane.XZ.offset(-19.99996), keep=Keep.BOTTOM)


with BuildPart() as f7_tool32_1:
    add(f7_tool32.part)

    # F7_t40: intersect F7_tool36
    add(f7_tool36.part, mode=Mode.INTERSECT)


with BuildPart() as f1_2:
    add(f1_1.part)

    # F7_t30: cut F7_tool32
    add(f7_tool32_1.part, mode=Mode.SUBTRACT)


with BuildPart() as f7_tool43:
    # F7_s44 → F7_t45 (new body)
    with BuildSketch(Plane.XZ.offset(4.12496)):
        with BuildLine():
            ThreePointArc((40.0278552353, 1.905), (38.5399576838, -1.6871024484), (34.9478552353, -3.175))
            Line((34.9478552353, -3.175), (40.0278552353, -3.175))
            Line((40.0278552353, -3.175), (40.0278552353, 1.905))
        make_face()
    extrude(amount=F7_T45_DEPTH)

    split(bisect_by=Plane.XZ.offset(16.82496), keep=Keep.BOTTOM)


with BuildPart() as f7_tool47:
    # F7_s48 → F7_t49 (new body)
    with BuildSketch(Plane.XY.offset(-19.05)):
        with BuildLine():
            ThreePointArc((40.0278552353, -11.74496), (38.5399576838, -15.3370624484), (34.9478552353, -16.82496))
            Line((34.9478552353, -16.82496), (40.0278552353, -16.82496))
            Line((40.0278552353, -16.82496), (40.0278552353, -11.74496))
        make_face()
    extrude(amount=F7_T49_DEPTH)

    split(bisect_by=Plane.XY.offset(-3.175), keep=Keep.TOP)


with BuildPart() as f7_tool43_1:
    add(f7_tool43.part)

    # F7_t51: intersect F7_tool47
    add(f7_tool47.part, mode=Mode.INTERSECT)


with BuildPart() as f1_3:
    add(f1_2.part)

    # F7_t41: cut F7_tool43
    add(f7_tool43_1.part, mode=Mode.SUBTRACT)


with BuildPart() as f7_tool54:
    # F7_s55 → F7_t56 (new body)
    with BuildSketch(Plane.XZ.offset(-19.99996)):
        with BuildLine():
            ThreePointArc((40.0278552353, 1.905), (38.5399576838, -1.6871024484), (34.9478552353, -3.175))
            Line((34.9478552353, -3.175), (40.0278552353, -3.175))
            Line((40.0278552353, -3.175), (40.0278552353, 1.905))
        make_face()
    extrude(amount=F7_T56_DEPTH)

    split(bisect_by=Plane.XZ.offset(-16.82496), keep=Keep.TOP)


with BuildPart() as f7_tool58:
    # F7_s59 → F7_t60 (new body)
    with BuildSketch(Plane.XY.offset(-19.05)):
        with BuildLine():
            ThreePointArc((40.0278552353, 11.74496), (38.5399576838, 15.3370624484), (34.9478552353, 16.82496))
            Line((34.9478552353, 16.82496), (40.0278552353, 16.82496))
            Line((40.0278552353, 16.82496), (40.0278552353, 11.74496))
        make_face()
    extrude(amount=F7_T60_DEPTH)

    split(bisect_by=Plane.XY.offset(-3.175), keep=Keep.TOP)


with BuildPart() as f7_tool54_1:
    add(f7_tool54.part)

    # F7_t62: intersect F7_tool58
    add(f7_tool58.part, mode=Mode.INTERSECT)


with BuildPart() as f1_4:
    add(f1_3.part)

    # F7_t52: cut F7_tool54
    add(f7_tool54_1.part, mode=Mode.SUBTRACT)

    # F8
    f8_edges = [f1_4.edges().sort_by_distance(p)[0] for p in [
        (36.852855, 36.852855, 69.664643),
        (36.852855, -36.852855, 69.664643),
        (-36.852855, -36.852855, 69.664643),
        (-36.852855, 36.852855, 69.664643),
    ]]
    fillet(f8_edges, radius=F8_R)


solid = f1_4.part
